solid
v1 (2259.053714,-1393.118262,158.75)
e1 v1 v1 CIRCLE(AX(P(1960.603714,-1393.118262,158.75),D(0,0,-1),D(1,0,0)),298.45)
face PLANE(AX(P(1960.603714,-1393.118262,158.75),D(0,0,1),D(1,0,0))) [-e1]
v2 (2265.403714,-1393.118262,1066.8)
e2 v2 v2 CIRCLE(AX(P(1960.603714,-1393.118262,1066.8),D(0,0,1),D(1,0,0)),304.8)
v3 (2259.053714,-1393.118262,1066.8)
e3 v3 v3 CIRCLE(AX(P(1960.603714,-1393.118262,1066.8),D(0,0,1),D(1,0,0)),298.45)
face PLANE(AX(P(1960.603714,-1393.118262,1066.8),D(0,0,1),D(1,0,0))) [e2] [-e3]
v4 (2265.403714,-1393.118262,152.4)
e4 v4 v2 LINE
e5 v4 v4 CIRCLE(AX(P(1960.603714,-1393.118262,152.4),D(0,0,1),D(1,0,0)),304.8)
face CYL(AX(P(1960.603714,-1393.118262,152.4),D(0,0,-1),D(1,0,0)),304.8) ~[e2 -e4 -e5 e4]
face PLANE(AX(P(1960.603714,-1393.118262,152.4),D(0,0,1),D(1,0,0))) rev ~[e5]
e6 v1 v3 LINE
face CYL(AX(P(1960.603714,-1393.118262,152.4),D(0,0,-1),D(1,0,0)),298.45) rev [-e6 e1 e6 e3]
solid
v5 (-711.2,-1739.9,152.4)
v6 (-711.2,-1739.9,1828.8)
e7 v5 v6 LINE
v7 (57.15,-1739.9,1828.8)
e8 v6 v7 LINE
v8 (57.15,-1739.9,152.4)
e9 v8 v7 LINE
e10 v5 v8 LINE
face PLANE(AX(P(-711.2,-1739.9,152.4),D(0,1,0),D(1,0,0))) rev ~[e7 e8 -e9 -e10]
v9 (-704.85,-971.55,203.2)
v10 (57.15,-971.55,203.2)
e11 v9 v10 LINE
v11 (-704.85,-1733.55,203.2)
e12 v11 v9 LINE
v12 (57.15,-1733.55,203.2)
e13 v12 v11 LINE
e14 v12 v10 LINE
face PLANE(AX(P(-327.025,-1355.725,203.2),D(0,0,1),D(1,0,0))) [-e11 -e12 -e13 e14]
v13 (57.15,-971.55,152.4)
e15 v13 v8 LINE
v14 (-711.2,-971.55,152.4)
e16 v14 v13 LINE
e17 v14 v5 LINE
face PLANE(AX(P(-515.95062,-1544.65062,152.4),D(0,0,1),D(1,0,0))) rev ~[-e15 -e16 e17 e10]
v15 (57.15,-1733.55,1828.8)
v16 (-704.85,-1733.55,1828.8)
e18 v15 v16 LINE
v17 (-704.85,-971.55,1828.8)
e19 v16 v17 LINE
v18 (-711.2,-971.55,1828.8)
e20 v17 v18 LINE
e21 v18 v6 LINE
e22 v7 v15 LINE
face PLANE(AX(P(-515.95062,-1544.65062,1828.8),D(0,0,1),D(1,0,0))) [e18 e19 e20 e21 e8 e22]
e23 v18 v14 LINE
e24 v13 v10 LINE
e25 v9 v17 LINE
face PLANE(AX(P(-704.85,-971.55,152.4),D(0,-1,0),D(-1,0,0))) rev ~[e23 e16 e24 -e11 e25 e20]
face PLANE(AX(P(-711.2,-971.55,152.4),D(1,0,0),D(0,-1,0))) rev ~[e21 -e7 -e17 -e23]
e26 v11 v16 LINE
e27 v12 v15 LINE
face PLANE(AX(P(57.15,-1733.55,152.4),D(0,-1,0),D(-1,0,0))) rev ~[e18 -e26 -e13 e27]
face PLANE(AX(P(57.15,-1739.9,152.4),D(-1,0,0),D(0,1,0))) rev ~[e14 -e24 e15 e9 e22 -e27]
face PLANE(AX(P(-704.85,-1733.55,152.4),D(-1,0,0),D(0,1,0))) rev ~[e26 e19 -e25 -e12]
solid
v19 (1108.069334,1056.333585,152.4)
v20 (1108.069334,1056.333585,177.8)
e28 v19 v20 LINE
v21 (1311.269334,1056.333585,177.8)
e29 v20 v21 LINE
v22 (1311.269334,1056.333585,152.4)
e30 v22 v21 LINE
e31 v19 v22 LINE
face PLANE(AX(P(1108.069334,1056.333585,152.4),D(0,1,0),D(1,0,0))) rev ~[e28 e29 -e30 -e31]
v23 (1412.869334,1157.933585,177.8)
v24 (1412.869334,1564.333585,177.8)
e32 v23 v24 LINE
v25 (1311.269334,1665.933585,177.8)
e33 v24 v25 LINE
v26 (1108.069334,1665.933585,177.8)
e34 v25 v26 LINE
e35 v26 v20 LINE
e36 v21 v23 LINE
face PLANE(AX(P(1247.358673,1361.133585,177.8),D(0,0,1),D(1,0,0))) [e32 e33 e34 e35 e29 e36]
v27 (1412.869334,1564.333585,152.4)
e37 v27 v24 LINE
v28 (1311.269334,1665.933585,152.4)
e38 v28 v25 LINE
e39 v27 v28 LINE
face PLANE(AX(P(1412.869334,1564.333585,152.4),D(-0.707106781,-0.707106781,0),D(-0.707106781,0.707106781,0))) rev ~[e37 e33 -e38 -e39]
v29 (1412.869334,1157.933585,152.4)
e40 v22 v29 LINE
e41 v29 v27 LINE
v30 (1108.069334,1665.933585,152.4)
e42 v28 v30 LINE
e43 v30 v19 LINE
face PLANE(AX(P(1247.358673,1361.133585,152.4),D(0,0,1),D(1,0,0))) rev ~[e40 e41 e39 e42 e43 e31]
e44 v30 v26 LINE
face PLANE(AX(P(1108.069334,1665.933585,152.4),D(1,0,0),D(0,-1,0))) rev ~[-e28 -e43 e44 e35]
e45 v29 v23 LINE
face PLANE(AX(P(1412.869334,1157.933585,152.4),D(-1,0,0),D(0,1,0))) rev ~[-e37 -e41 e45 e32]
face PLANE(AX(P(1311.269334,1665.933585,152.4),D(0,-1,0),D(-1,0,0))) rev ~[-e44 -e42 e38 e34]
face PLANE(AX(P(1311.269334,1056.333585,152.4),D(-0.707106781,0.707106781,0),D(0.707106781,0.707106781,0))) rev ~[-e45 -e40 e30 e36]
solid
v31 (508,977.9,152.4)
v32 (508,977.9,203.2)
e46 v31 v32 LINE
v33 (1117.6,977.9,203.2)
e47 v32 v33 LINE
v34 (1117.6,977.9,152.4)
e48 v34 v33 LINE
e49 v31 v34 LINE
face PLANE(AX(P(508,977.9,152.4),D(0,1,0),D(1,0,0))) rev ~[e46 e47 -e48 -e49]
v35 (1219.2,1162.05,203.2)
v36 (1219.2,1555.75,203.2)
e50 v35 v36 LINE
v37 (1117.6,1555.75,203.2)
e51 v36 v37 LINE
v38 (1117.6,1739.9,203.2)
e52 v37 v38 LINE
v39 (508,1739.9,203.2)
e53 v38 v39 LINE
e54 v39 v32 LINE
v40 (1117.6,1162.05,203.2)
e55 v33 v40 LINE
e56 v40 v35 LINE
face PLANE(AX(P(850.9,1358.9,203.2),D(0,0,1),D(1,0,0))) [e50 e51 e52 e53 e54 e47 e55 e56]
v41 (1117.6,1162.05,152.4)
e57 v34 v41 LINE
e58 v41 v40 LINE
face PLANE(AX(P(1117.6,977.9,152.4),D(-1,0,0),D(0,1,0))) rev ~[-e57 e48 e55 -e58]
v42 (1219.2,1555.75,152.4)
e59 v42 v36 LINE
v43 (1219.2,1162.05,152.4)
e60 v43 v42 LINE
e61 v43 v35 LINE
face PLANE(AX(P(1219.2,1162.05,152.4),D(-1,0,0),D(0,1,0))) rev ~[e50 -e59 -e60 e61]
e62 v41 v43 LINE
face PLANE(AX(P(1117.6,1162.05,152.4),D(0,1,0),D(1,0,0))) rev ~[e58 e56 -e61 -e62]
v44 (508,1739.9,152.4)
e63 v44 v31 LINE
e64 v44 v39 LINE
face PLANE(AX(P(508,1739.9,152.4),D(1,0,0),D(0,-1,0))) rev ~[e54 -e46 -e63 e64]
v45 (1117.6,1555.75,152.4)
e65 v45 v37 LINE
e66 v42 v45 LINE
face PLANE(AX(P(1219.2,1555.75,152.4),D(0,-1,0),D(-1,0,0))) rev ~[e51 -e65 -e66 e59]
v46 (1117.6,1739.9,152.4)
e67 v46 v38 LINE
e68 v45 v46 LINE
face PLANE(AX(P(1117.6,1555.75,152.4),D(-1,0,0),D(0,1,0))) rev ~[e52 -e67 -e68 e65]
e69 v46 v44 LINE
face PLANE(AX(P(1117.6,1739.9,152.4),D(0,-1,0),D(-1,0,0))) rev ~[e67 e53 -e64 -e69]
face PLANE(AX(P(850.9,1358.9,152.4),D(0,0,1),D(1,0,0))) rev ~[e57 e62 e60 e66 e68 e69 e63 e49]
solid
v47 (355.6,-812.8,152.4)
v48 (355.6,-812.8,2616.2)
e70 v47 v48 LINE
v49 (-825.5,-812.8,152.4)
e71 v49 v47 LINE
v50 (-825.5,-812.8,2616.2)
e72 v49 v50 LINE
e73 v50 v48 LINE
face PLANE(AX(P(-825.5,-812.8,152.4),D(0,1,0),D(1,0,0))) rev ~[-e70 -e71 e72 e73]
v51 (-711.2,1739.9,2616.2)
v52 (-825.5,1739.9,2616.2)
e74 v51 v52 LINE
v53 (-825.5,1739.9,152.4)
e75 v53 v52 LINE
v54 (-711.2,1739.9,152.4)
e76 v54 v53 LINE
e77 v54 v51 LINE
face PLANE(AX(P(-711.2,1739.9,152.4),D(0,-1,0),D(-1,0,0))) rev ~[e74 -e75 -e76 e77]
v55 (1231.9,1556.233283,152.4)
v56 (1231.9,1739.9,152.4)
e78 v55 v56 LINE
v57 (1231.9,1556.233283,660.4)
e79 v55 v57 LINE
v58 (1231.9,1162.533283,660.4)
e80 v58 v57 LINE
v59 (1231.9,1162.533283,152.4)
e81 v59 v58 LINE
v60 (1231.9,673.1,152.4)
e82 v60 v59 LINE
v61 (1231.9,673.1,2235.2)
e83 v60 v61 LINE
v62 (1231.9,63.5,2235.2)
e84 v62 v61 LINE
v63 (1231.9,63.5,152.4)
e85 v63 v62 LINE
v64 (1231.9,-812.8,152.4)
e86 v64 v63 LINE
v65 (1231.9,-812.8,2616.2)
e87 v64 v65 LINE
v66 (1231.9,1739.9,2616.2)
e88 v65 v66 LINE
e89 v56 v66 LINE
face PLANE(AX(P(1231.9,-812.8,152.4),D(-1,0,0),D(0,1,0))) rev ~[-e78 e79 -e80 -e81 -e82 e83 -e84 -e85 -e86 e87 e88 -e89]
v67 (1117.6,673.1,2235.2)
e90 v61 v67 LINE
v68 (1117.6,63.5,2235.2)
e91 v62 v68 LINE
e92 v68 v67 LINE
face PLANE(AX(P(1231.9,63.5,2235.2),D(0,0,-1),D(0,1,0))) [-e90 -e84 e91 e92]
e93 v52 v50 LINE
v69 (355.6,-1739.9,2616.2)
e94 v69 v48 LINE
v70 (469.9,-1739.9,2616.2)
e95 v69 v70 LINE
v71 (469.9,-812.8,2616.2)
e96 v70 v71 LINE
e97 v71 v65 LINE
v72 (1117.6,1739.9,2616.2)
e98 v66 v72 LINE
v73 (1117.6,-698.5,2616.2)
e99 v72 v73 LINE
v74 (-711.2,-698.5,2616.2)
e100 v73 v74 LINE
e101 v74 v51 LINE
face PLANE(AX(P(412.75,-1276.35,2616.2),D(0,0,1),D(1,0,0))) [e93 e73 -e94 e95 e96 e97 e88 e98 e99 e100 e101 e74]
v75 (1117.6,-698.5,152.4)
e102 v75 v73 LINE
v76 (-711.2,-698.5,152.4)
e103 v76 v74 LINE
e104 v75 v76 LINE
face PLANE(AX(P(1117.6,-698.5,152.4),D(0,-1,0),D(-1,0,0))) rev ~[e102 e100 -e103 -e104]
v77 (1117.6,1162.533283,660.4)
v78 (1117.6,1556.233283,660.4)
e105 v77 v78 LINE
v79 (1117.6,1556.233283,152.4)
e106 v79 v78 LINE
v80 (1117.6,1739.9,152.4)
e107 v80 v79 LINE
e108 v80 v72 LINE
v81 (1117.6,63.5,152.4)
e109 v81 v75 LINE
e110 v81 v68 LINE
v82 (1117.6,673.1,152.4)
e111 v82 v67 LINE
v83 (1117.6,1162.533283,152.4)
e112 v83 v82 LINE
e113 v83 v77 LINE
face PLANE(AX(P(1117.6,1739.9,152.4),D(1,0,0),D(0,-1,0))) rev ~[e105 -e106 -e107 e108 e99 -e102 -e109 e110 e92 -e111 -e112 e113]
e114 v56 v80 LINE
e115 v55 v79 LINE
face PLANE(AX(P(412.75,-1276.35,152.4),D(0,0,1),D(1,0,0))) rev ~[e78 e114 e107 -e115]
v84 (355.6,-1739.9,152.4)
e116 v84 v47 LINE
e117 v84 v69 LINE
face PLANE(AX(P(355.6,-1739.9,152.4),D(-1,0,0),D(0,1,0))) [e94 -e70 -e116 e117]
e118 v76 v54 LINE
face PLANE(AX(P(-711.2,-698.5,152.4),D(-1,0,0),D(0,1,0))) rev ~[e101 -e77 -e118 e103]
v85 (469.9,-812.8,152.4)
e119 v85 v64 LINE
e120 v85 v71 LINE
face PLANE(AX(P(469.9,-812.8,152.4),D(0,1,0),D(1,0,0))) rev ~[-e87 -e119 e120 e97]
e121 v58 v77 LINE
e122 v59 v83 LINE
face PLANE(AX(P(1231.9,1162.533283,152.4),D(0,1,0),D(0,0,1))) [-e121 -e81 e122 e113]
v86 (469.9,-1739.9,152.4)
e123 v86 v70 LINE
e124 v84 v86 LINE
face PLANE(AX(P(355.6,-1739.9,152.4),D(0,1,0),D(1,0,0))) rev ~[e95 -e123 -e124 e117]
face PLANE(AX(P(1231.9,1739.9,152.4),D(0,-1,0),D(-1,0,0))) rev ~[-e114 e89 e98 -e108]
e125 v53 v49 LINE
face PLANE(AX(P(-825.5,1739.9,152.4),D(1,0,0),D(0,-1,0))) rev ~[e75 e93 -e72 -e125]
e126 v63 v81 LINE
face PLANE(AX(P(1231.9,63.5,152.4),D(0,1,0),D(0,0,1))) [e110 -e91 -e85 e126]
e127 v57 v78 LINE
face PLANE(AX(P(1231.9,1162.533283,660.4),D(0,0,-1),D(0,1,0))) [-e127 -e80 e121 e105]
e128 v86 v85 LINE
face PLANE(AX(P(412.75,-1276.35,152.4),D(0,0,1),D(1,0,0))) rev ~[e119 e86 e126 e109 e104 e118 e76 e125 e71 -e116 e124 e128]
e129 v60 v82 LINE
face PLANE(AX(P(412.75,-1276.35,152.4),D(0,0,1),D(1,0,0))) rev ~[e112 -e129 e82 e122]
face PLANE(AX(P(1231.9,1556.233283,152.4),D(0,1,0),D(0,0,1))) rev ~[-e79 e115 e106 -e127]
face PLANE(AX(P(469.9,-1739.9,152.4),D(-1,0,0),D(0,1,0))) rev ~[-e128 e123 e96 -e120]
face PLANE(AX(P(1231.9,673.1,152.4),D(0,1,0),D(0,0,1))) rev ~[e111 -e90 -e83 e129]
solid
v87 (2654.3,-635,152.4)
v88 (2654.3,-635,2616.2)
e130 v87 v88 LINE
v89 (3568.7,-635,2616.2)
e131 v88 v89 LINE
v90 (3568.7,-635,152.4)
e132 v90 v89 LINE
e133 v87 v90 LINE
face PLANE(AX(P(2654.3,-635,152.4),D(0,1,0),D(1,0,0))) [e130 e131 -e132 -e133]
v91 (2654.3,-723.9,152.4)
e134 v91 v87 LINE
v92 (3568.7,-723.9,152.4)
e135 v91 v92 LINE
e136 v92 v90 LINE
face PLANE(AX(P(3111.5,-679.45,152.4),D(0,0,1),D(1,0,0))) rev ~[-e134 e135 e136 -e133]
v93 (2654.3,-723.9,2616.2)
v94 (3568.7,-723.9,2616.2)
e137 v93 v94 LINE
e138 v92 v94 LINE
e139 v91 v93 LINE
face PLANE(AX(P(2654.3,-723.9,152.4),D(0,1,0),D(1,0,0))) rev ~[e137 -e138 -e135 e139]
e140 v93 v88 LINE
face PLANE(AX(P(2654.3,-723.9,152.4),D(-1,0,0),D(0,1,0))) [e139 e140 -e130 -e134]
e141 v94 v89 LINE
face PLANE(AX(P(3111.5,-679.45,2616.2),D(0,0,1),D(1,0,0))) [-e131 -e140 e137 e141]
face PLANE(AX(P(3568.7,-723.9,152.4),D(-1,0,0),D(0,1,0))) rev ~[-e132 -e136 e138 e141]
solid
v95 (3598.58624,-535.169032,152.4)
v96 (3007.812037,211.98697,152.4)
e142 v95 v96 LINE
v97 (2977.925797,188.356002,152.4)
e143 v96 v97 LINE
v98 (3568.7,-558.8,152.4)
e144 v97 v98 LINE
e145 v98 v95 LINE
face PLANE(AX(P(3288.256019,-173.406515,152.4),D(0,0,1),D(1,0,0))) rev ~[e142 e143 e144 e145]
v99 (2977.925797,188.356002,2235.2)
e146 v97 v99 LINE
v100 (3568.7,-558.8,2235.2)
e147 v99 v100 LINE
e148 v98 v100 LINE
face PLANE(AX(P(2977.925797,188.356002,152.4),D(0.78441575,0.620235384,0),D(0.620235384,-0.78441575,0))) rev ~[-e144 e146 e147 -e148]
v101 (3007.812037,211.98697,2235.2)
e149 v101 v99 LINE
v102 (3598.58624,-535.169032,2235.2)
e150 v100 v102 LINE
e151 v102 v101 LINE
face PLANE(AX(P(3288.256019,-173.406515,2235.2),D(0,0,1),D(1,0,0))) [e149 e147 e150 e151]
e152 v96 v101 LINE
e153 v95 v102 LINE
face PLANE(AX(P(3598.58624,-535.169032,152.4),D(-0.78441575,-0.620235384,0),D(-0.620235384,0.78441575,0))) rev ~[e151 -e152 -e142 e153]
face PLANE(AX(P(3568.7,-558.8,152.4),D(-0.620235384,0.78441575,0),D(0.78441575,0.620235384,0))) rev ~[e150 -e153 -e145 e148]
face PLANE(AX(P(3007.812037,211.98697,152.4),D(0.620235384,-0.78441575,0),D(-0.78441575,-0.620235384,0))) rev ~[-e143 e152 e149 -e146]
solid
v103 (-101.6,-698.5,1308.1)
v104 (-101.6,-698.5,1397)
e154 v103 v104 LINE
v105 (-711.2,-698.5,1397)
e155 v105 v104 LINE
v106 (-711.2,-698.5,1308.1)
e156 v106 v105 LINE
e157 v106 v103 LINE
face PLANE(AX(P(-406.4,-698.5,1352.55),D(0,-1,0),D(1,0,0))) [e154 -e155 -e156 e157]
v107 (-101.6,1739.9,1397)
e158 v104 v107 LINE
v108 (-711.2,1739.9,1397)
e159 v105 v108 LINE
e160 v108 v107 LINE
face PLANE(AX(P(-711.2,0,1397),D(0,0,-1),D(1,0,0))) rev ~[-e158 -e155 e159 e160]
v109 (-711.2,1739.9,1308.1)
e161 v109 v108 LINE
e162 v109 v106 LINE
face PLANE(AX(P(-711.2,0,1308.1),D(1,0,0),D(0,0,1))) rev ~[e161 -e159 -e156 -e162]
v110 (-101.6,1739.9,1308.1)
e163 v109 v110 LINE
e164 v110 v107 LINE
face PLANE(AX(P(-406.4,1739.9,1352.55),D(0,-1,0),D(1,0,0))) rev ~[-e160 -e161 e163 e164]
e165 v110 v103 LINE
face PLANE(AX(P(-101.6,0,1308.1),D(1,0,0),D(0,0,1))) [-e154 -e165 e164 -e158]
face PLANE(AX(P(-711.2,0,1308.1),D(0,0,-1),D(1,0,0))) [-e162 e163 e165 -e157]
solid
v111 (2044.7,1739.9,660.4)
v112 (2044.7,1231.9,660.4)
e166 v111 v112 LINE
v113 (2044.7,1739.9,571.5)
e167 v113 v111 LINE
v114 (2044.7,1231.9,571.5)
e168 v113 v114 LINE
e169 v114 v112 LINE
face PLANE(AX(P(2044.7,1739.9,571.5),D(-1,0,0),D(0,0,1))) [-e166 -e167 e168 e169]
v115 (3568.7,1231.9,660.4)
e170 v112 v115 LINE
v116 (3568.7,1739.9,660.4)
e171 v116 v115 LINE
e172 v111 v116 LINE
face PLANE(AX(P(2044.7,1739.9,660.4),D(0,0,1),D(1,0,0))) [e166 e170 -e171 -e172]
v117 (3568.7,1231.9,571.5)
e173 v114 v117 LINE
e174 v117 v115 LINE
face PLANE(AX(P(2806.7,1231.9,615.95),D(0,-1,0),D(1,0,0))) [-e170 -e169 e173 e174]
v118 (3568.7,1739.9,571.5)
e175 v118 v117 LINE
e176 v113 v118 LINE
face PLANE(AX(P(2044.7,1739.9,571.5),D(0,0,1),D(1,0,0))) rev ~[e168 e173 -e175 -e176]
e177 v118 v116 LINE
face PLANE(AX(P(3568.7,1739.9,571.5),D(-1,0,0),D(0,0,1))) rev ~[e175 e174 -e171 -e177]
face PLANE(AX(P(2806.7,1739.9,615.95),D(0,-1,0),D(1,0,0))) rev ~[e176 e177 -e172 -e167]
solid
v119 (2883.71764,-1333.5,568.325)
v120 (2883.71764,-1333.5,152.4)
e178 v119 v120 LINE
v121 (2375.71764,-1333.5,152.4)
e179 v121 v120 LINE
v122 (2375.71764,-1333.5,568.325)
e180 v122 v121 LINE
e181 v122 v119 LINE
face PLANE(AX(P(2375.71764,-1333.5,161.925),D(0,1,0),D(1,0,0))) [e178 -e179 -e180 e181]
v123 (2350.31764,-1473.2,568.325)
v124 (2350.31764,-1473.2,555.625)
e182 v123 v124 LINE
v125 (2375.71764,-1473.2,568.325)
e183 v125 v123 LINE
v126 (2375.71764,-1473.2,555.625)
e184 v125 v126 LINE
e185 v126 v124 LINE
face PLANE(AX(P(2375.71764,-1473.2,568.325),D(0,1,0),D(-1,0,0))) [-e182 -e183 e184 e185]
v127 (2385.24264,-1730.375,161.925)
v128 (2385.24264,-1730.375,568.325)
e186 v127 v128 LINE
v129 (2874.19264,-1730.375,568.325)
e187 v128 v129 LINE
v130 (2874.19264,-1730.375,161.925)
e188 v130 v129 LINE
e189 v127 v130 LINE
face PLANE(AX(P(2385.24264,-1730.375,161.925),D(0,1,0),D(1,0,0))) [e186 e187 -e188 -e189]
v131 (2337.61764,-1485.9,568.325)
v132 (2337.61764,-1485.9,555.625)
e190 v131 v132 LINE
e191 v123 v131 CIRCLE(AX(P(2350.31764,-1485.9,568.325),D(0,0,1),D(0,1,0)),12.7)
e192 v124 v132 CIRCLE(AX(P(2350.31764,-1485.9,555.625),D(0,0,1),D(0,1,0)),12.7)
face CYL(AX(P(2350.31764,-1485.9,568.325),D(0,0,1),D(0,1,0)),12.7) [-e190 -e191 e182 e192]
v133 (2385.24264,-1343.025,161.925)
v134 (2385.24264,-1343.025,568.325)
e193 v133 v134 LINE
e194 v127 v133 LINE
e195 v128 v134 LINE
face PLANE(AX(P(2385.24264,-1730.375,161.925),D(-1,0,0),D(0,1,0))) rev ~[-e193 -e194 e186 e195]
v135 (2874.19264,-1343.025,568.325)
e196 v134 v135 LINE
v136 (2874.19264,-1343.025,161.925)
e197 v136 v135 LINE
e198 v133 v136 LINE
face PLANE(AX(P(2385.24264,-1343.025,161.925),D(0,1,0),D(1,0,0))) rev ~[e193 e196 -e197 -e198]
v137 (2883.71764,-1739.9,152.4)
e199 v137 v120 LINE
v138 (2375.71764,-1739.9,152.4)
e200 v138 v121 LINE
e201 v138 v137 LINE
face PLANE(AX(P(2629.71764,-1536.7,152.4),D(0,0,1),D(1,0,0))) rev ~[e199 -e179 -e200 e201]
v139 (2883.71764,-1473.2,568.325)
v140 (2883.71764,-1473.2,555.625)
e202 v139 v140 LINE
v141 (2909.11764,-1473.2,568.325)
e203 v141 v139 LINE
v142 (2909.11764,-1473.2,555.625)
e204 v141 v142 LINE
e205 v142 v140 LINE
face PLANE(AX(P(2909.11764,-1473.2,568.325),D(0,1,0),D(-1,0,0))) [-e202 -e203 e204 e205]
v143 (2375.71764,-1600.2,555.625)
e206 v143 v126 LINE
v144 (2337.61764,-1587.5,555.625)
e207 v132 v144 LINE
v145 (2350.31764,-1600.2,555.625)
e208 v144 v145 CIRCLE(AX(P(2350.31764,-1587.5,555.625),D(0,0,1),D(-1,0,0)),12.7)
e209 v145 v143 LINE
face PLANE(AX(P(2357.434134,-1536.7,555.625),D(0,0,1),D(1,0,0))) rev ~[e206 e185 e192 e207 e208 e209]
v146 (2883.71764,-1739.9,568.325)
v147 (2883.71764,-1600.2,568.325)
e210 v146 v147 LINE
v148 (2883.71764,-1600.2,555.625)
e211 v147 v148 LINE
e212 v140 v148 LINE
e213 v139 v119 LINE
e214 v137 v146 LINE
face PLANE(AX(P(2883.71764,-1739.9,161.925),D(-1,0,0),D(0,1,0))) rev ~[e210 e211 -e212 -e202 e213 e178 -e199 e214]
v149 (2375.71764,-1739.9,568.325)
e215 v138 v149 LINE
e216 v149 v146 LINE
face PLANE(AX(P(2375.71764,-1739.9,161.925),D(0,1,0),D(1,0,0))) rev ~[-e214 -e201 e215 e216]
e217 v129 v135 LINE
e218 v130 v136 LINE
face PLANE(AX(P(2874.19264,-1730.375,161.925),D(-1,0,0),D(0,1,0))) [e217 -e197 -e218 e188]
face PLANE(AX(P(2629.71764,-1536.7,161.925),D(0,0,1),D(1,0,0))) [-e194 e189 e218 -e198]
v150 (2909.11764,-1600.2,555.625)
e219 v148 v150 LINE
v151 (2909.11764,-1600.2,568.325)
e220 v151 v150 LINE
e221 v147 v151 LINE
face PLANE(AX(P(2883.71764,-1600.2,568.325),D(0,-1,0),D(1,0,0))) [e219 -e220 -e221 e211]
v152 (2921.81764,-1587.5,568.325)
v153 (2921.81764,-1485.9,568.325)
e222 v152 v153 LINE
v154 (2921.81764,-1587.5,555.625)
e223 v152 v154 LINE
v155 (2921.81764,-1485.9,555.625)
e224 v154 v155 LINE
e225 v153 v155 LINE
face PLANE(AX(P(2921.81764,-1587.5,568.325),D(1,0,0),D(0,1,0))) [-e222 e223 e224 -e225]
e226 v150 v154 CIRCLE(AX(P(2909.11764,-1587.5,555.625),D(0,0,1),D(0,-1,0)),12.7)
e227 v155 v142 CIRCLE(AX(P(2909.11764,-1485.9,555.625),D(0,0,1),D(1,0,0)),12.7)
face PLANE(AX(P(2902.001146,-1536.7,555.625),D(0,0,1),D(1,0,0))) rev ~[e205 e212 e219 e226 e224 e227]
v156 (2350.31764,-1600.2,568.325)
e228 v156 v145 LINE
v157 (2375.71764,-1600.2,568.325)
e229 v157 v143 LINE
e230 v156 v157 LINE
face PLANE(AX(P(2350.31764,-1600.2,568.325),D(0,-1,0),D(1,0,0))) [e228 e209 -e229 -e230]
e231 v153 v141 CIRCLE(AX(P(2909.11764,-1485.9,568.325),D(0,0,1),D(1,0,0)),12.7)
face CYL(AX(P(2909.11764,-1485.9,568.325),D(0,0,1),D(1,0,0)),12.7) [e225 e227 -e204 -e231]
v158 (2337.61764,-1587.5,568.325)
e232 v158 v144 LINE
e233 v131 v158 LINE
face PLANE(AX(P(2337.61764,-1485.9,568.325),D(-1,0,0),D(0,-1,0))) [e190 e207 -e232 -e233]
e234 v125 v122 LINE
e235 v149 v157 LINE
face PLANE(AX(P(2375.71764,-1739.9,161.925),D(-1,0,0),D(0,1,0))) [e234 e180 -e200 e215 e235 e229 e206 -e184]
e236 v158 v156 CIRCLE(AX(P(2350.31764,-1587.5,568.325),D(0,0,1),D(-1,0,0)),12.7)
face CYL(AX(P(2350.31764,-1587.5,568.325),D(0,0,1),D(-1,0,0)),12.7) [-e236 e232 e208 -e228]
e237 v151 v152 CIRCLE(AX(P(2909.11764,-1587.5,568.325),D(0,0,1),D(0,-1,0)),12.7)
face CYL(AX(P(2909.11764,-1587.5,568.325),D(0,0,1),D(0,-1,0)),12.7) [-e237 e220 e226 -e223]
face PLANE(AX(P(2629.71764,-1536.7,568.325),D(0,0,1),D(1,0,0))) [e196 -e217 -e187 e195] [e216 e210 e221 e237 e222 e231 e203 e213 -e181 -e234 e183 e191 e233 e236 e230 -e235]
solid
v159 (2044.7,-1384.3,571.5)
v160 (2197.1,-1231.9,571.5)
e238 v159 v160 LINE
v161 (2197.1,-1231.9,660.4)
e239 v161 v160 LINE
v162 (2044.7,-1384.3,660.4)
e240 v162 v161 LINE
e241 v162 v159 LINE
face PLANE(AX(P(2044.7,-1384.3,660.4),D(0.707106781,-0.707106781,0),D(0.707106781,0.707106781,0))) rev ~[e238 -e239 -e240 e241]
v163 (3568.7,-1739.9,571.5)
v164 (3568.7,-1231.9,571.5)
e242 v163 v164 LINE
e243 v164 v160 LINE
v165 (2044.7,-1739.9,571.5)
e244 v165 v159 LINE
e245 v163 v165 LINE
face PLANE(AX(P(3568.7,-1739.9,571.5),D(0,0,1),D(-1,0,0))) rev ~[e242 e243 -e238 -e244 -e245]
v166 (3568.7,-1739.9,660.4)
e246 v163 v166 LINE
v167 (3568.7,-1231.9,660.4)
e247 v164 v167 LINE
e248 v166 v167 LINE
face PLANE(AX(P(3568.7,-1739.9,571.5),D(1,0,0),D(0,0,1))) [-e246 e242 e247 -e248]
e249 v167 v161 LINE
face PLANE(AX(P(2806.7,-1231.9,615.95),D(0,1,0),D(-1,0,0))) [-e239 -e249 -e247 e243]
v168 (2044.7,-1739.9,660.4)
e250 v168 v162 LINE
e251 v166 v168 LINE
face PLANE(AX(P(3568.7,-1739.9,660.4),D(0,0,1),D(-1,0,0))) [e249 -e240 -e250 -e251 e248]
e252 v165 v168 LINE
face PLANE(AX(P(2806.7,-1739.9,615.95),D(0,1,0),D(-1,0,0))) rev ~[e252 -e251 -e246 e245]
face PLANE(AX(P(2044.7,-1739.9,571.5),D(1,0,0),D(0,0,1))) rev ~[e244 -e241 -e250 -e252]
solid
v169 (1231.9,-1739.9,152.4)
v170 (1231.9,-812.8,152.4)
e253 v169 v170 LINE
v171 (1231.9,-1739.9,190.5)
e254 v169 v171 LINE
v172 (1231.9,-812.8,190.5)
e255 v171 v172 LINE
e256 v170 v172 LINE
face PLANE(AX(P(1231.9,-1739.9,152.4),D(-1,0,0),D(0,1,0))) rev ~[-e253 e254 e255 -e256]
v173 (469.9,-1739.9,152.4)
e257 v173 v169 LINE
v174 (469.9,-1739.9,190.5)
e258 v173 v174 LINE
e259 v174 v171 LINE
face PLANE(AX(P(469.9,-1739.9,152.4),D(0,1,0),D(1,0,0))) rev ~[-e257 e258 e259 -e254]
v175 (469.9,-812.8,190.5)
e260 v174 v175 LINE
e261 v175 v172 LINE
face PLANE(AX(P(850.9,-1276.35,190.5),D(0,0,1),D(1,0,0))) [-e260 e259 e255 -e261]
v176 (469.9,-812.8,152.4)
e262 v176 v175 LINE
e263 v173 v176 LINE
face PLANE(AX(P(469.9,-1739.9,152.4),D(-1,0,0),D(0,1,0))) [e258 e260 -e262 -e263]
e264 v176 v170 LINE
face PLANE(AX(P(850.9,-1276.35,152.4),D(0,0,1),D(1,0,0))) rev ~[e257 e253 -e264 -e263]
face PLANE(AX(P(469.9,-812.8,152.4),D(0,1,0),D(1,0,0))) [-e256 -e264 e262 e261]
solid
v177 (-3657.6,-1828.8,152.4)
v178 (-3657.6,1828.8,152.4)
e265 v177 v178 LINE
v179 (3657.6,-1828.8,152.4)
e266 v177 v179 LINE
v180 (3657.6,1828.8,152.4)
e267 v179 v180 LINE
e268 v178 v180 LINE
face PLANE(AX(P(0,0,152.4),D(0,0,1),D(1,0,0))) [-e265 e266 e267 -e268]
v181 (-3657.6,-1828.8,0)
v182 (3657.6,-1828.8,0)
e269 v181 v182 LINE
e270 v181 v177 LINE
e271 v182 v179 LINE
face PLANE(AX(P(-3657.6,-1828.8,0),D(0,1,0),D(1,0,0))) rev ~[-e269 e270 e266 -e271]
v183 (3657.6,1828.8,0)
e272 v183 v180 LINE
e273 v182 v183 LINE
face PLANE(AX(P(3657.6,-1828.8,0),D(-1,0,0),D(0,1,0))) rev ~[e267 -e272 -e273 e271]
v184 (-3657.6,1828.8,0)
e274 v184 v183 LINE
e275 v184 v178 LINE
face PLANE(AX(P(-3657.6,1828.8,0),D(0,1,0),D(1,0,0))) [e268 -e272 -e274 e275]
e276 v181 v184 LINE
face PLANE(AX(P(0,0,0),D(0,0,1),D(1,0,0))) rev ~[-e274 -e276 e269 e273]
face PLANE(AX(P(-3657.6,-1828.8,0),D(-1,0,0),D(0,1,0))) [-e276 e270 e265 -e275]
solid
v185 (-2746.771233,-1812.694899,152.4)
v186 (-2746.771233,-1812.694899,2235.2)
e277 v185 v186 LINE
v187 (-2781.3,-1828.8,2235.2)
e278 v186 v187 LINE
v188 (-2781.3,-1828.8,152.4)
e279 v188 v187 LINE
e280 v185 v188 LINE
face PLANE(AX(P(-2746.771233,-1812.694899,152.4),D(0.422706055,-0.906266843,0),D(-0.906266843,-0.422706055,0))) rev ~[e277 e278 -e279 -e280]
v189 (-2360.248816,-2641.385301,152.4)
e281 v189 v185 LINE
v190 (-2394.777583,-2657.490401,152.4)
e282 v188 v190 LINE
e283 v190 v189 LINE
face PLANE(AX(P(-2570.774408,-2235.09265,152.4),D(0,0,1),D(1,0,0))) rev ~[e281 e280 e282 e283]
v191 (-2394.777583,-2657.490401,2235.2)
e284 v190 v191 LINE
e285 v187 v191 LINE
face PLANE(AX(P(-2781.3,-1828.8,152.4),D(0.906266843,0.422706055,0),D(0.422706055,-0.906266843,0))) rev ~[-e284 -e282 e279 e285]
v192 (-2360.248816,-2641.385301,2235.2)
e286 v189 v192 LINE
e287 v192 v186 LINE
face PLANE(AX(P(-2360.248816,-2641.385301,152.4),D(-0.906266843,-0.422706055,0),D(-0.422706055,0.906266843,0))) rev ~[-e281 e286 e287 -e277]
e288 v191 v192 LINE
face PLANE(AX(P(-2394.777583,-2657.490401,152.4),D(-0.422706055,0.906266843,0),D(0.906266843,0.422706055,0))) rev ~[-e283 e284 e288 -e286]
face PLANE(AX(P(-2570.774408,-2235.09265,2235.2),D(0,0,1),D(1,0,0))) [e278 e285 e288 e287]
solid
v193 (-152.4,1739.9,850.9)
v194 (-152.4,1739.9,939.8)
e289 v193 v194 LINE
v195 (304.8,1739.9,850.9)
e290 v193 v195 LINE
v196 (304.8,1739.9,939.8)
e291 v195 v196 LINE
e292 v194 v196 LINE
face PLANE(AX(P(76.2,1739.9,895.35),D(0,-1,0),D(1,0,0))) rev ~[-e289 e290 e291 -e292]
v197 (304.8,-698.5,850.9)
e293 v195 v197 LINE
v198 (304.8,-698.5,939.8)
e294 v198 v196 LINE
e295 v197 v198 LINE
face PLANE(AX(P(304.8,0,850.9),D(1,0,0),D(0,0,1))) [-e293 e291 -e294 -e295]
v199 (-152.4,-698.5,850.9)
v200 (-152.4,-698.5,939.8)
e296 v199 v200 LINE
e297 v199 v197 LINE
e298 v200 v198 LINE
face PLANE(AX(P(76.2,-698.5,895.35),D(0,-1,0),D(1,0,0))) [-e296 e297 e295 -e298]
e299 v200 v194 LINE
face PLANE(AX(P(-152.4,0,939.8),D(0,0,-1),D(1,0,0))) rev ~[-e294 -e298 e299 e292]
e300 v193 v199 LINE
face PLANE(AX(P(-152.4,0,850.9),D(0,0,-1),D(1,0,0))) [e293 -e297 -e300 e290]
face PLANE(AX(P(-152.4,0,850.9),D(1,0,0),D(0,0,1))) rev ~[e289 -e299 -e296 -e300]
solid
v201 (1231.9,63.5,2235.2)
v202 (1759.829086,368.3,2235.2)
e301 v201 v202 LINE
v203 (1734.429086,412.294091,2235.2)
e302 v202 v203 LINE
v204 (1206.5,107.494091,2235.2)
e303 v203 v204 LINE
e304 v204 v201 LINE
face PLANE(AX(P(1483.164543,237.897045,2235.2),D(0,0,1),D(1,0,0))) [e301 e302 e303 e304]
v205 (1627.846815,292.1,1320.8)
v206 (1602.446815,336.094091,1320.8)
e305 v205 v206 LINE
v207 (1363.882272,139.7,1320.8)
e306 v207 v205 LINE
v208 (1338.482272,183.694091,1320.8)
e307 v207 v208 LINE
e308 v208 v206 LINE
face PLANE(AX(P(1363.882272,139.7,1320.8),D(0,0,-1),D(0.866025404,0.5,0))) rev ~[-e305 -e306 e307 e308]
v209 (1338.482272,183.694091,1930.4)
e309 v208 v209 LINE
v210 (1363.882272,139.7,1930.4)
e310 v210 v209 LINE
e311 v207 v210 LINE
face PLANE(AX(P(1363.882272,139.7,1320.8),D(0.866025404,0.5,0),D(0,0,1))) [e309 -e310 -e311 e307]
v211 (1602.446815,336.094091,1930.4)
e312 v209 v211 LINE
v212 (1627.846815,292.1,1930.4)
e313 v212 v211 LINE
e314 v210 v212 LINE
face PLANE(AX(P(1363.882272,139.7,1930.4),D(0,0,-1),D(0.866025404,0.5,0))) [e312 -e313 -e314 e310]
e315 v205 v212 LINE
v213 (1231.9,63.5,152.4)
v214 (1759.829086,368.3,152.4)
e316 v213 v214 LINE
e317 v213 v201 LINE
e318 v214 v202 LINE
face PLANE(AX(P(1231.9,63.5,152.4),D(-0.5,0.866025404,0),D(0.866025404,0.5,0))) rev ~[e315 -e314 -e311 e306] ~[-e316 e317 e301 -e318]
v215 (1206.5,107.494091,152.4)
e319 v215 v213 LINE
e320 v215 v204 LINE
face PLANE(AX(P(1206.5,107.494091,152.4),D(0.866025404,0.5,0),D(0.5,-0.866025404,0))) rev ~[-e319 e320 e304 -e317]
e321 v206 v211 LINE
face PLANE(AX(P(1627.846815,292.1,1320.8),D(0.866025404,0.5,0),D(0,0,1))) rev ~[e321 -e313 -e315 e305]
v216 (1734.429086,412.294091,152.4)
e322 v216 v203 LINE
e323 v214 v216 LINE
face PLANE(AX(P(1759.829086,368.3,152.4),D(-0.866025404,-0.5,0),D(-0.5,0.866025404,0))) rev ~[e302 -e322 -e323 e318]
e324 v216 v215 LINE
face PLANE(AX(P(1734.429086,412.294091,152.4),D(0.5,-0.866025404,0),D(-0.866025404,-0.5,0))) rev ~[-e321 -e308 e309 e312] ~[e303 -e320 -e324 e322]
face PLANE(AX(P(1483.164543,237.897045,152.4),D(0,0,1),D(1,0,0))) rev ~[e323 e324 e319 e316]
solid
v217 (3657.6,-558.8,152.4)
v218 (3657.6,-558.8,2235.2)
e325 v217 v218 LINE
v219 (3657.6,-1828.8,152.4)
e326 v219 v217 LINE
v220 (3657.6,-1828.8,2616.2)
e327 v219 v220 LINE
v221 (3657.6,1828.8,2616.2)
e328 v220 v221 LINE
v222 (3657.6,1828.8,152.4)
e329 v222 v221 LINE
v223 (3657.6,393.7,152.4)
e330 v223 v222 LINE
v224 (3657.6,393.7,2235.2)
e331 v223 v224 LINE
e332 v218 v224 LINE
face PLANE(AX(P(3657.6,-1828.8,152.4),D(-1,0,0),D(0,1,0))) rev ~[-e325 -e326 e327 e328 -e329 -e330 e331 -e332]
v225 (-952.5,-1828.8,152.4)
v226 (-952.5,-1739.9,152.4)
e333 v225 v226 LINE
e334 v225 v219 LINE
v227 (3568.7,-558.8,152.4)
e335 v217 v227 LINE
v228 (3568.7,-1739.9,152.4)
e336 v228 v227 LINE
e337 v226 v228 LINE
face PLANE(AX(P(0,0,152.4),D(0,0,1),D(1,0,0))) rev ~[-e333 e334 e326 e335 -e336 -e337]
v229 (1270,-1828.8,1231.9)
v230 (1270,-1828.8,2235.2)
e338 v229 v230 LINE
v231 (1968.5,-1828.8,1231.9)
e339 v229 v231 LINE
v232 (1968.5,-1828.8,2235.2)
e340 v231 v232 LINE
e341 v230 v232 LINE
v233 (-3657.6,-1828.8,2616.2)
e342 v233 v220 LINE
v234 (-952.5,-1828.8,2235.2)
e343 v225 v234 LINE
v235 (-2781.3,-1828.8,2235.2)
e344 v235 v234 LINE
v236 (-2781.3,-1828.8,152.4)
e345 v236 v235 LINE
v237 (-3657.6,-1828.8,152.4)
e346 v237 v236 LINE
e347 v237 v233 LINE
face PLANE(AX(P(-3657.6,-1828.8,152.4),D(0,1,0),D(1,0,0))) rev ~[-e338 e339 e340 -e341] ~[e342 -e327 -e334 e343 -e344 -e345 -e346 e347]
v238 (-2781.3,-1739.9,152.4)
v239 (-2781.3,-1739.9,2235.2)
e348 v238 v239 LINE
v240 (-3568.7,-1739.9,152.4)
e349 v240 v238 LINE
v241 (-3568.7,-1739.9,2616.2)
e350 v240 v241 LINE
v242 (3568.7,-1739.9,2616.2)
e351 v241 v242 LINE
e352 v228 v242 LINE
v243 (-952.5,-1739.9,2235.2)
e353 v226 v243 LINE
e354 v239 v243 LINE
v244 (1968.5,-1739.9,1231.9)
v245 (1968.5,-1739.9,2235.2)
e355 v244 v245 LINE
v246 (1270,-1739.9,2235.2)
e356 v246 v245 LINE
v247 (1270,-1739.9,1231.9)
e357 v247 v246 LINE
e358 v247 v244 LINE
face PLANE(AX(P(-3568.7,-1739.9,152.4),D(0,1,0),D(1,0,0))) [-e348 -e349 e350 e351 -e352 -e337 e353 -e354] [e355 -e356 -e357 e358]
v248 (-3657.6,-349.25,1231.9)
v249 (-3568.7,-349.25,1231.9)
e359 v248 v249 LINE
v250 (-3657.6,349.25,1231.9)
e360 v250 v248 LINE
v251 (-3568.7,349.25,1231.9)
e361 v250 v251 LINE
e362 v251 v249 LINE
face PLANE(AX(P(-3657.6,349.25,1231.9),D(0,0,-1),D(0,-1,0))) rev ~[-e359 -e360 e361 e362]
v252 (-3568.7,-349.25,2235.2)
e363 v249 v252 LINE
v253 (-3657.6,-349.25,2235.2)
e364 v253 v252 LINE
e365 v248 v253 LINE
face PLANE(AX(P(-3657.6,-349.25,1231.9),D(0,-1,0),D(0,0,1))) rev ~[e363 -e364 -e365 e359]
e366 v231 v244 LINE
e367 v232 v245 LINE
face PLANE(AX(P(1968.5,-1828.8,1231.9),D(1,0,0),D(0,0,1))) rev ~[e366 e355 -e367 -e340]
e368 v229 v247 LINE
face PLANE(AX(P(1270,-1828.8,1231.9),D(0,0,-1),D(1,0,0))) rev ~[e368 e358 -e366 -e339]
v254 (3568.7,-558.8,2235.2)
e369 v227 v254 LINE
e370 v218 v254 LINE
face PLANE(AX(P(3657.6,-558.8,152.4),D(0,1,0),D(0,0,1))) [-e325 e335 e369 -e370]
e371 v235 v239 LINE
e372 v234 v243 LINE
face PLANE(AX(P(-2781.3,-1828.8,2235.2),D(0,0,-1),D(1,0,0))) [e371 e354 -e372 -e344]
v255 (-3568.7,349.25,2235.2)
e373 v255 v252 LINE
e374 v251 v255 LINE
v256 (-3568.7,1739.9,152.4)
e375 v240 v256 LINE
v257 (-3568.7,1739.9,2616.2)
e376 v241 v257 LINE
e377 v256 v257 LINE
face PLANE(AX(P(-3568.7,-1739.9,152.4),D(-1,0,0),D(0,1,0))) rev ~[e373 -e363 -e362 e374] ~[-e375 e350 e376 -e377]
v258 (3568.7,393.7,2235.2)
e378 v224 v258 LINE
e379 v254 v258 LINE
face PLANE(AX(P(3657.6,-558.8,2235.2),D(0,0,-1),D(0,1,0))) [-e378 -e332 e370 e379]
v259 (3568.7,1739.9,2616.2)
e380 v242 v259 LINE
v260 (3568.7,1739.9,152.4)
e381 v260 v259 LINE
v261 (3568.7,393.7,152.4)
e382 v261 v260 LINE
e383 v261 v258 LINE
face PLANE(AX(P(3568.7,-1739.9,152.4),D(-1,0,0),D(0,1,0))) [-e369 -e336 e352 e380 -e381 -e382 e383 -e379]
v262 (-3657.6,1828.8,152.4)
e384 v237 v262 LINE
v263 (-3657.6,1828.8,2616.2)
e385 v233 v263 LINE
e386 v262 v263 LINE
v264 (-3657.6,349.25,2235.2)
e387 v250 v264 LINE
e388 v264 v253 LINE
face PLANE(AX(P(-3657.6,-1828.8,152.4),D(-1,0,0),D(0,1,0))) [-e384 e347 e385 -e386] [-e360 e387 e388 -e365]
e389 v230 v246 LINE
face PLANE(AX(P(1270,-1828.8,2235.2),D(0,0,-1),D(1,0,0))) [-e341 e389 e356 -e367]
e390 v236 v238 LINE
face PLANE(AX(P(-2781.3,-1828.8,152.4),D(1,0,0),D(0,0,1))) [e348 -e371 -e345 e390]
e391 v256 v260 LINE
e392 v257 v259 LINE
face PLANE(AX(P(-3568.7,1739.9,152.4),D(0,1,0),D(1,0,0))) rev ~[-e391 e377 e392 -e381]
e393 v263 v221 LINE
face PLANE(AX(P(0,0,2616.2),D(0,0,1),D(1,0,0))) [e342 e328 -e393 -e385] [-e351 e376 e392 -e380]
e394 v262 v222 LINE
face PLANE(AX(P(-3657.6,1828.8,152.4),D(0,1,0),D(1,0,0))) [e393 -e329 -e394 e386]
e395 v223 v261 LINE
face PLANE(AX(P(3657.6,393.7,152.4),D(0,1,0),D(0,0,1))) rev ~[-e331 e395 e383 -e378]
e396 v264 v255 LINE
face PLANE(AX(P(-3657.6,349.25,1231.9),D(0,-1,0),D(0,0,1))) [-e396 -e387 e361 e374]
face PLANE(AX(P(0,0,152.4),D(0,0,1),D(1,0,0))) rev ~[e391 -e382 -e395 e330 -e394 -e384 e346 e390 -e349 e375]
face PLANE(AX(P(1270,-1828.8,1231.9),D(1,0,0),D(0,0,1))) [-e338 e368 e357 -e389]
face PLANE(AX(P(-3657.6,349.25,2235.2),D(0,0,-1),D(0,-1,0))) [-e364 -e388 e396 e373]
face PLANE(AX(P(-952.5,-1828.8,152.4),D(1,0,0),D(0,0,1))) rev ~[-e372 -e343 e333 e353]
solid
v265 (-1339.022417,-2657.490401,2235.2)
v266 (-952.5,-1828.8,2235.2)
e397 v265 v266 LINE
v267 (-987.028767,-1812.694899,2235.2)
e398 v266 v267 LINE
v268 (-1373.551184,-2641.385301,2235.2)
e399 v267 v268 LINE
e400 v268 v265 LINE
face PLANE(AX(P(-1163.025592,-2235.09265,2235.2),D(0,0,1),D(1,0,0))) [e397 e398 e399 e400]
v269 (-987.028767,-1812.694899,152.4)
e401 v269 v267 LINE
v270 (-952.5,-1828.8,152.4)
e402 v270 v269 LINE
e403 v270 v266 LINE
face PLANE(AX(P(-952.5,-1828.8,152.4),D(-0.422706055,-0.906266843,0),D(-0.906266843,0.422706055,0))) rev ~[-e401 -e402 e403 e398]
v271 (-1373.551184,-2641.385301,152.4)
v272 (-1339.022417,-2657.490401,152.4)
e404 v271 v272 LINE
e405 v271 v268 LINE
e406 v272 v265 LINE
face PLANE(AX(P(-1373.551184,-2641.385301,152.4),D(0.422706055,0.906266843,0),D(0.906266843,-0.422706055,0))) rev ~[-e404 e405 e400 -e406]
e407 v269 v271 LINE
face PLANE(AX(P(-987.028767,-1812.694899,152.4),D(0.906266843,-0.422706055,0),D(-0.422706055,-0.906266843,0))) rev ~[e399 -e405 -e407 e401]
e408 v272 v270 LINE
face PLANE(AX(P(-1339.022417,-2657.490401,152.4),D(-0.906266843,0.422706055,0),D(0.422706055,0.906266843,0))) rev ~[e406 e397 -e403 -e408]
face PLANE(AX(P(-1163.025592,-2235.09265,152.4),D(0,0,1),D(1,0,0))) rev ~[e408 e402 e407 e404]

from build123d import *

# Parameters (mm, degrees)
F0_W           = 7315.2
F0_H           = 3657.6
F1_DEPTH       = 152.4
F2_W           = 7315.2
F2_H           = 3657.6
F2_W_2         = 7137.4
F2_H_2         = 3479.8
F3_DEPTH       = 2463.8
F4_W           = 952.5
F4_H           = 2082.8
F5_DEPTH       = 88.9
F6_W           = 1828.8
F6_H           = 2082.8
F6_W_2         = 698.5
F6_H_2         = 1003.3
F7_DEPTH       = 88.9
F8_W           = 698.5
F8_H           = 1003.3
F9_DEPTH       = 88.9
F10_W          = 114.3
F10_H          = 927.1
F11_DEPTH      = 2463.8
F12_W          = 914.4
F12_H          = 88.9
F13_DEPTH      = 2463.8
F14_W          = 609.6
F14_H          = 2082.8
F15_DEPTH      = 114.3
F16_W          = 609.6
F16_H          = 88.9
F17_DEPTH      = 698.5
F17_DEPTH_BACK = 1739.9
F18_W          = 457.2
F18_H          = 88.9
F19_DEPTH      = 698.5
F19_DEPTH_BACK = 1739.9
F20_W          = 1524
F20_H          = 88.9
F21_DEPTH      = 508
F24_DEPTH      = 2082.8
F26_DEPTH      = 2082.8
F28_DEPTH      = 1676.4
F29_W          = 768.35
F29_H          = 768.35
F30_DEPTH      = 50.8
F31_W          = 1524
F31_H          = 88.9
F32_DEPTH      = 508
F34_DEPTH      = 88.9
F35_W          = 304.8
F35_H          = 609.6
F36_DEPTH      = 50.8
F38_DEPTH      = 50.8
F40_DEPTH      = 25.4
F41_W          = 508
F41_H          = 406.4
F42_DEPTH      = 9.525
F43_W          = 508
F43_H          = 406.4
F43_W_2        = 488.95
F43_H_2        = 387.35
F44_DEPTH      = 406.4
F46_DEPTH      = 12.7
F49_DEPTH      = 2082.8
F50_R          = 304.8
F51_DEPTH      = 914.4
F52_T          = -6.35
F53_W          = 762
F53_H          = 927.1
F54_DEPTH      = 38.1
F55_W          = 393.7
F55_H          = 508
F56_DEPTH      = 114.3


with BuildPart() as f1:
    # F0 (on Top) → F1 (new body)
    with BuildSketch(Plane.XY):
        Rectangle(F0_W, F0_H)
    extrude(amount=F1_DEPTH)


with BuildPart() as f3:
    # F2 (on face) → F3 (new body)
    with BuildSketch(Plane.XY.offset(152.4)):
        Rectangle(F2_W, F2_H)
        Rectangle(F2_W_2, F2_H_2, mode=Mode.SUBTRACT)
    extrude(amount=F3_DEPTH)

    # F4 (on face) → F5 (cut, through all)
    with BuildSketch(Plane.YZ.offset(3657.6)):
        with Locations((-82.55, 1193.8)):
            Rectangle(F4_W, F4_H)
    extrude(amount=-F5_DEPTH, mode=Mode.SUBTRACT)

    # F6 (on face) → F7 (cut, through all)
    with BuildSketch(Plane.XZ.offset(1828.8)):
        with Locations((-1866.9, 1193.8)):
            Rectangle(F6_W, F6_H)
        with Locations((1619.25, 1733.55)):
            Rectangle(F6_W_2, F6_H_2)
    extrude(amount=-F7_DEPTH, mode=Mode.SUBTRACT)

    # F8 (on face) → F9 (cut, through all)
    with BuildSketch(Plane(origin=(-3657.6, 0, 0), x_dir=(0, -1, 0), z_dir=(-1, 0, 0))):
        with Locations((0, 1733.55)):
            Rectangle(F8_W, F8_H)
    extrude(amount=-F9_DEPTH, mode=Mode.SUBTRACT)


with BuildPart() as f11:
    # F10 (on face) → F11 (new body, through all)
    with BuildSketch(Plane.XY.offset(152.4)):
        with Locations((412.75, -1276.35)):
            Rectangle(F10_W, F10_H)
        Polygon((-825.5, -812.8), (355.6, -812.8), (469.9, -812.8), (1231.9, -812.8), (1231.9, 1739.9), (1117.6, 1739.9), (1117.6, -698.5), (-711.2, -698.5), (-711.2, 1739.9), (-825.5, 1739.9), align=None)
    extrude(amount=F11_DEPTH)

    # F14 (on face) → F15 (cut, through all)
    with BuildSketch(Plane.YZ.offset(1231.9)):
        with Locations((368.3, 1193.8)):
            Rectangle(F14_W, F14_H)
    extrude(amount=-F15_DEPTH, mode=Mode.SUBTRACT)

    # F55 (on face) → F56 (cut, through all)
    with BuildSketch(Plane.YZ.offset(1231.9)):
        with Locations((1359.3832832336, 406.4)):
            Rectangle(F55_W, F55_H)
    extrude(amount=-F56_DEPTH, mode=Mode.SUBTRACT)


with BuildPart() as f13:
    # F12 (on face) → F13 (new body, through all)
    with BuildSketch(Plane.XY.offset(152.4)):
        with Locations((3111.5, -679.45)):
            Rectangle(F12_W, F12_H)
    extrude(amount=F13_DEPTH)


with BuildPart() as f17:
    # F16 (on Front) → F17 (new body, two sides)
    with BuildSketch(Plane.XZ) as f17_sk:
        with Locations((-406.4, 1352.55)):
            Rectangle(F16_W, F16_H)
    extrude(amount=F17_DEPTH)
    extrude(f17_sk.sketch, amount=-F17_DEPTH_BACK)


with BuildPart() as f19:
    # F18 (on Front) → F19 (new body, two sides)
    with BuildSketch(Plane.XZ) as f19_sk:
        with Locations((76.2, 895.35)):
            Rectangle(F18_W, F18_H)
    extrude(amount=F19_DEPTH)
    extrude(f19_sk.sketch, amount=-F19_DEPTH_BACK)


with BuildPart() as f21:
    # F20 (on face) → F21 (new body)
    with BuildSketch(Plane.XZ.offset(-1739.9)):
        with Locations((2806.7, 615.95)):
            Rectangle(F20_W, F20_H)
    extrude(amount=F21_DEPTH)


with BuildPart() as f24:
    # F23 (on face) → F24 (new body)
    with BuildSketch(Plane.XY.offset(152.4)):
        Polygon((1734.429086147, 412.2940905122), (1206.5, 107.4940905122), (1231.9, 63.5), (1759.829086147, 368.3), align=None)
    extrude(amount=F24_DEPTH)

    # F35 (on face) → F36 (cut, through all)
    with BuildSketch(Plane(origin=(280.4786934298, -485.803347461, 0), x_dir=(0.8660254038, 0.5, 0), z_dir=(0.5, -0.8660254038, 0))):
        with Locations((1403.406694922, 1625.6)):
            Rectangle(F35_W, F35_H)
    extrude(amount=-F36_DEPTH, mode=Mode.SUBTRACT)


with BuildPart() as f26:
    # F25 (on face) → F26 (new body)
    with BuildSketch(Plane.XY.offset(152.4)):
        Polygon((2977.9257969634, 188.3560018005), (3568.7, -558.8), (3598.586240072, -535.1690318785), (3007.8120370354, 211.986969922), align=None)
    extrude(amount=F26_DEPTH)


with BuildPart() as f28:
    # F27 (on face) → F28 (new body)
    with BuildSketch(Plane.XY.offset(152.4)):
        Polygon((-711.2, -971.55), (-711.2, -1739.9), (57.15, -1739.9), (57.15, -1733.55), (-704.85, -1733.55), (-704.85, -971.55), align=None)
    extrude(amount=F28_DEPTH)

    # F29 (on face) → F30 (join)
    with BuildSketch(Plane.XY.offset(152.4)):
        with Locations((-327.025, -1355.725)):
            Rectangle(F29_W, F29_H)
    extrude(amount=F30_DEPTH)


with BuildPart() as f32:
    # F31 (on face) → F32 (new body)
    with BuildSketch(Plane(origin=(0, -1739.9, 0), x_dir=(-1, 0, 0), z_dir=(0, 1, 0))):
        with Locations((-2806.7, 615.95)):
            Rectangle(F31_W, F31_H)
    extrude(amount=F32_DEPTH)

    # F33 (on face) → F34 (cut, through all)
    with BuildSketch(Plane.XY.offset(660.4)):
        Polygon((2197.1, -1231.9), (2044.7, -1231.9), (2044.7, -1384.3), align=None)
    extrude(amount=-F34_DEPTH, mode=Mode.SUBTRACT)


with BuildPart() as f38:
    # F37 (on face) → F38 (new body)
    with BuildSketch(Plane.XY.offset(152.4)):
        Polygon((508, 977.9), (1117.6, 977.9), (1117.6, 1162.05), (1219.2, 1162.05), (1219.2, 1555.75), (1117.6, 1555.75), (1117.6, 1739.9), (508, 1739.9), align=None)
    extrude(amount=F38_DEPTH)


with BuildPart() as f40:
    # F39 (on face) → F40 (new body)
    with BuildSketch(Plane.XY.offset(152.4)):
        Polygon((1108.0693342209, 1665.9335847944), (1108.0693342209, 1056.3335847944), (1311.2693342209, 1056.3335847944), (1412.8693342209, 1157.9335847944), (1412.8693342209, 1564.3335847944), (1311.2693342209, 1665.9335847944), align=None)
    extrude(amount=F40_DEPTH)


with BuildPart() as f42:
    # F41 (on face) → F42 (new body)
    with BuildSketch(Plane.XY.offset(152.4)):
        with Locations((2629.7176399231, -1536.7)):
            Rectangle(F41_W, F41_H)
    extrude(amount=F42_DEPTH)

    # F43 (on face) → F44 (join)
    with BuildSketch(Plane.XY.offset(161.925)):
        with Locations((2629.7176399231, -1536.7)):
            Rectangle(F43_W, F43_H)
        with Locations((2629.7176399231, -1536.7)):
            Rectangle(F43_W_2, F43_H_2, mode=Mode.SUBTRACT)
    extrude(amount=F44_DEPTH)

    # F45 (on face) → F46 (join)
    with BuildSketch(Plane.XY.offset(568.325)):
        with BuildLine():
            Line((2350.3176399231, -1600.2), (2375.7176399231, -1600.2))
            Line((2375.7176399231, -1600.2), (2375.7176399231, -1473.2))
            Line((2375.7176399231, -1473.2), (2350.3176399231, -1473.2))
            ThreePointArc((2350.3176399231, -1473.2), (2341.337383802, -1476.9197438789), (2337.6176399231, -1485.9))
            Line((2337.6176399231, -1485.9), (2337.6176399231, -1587.5))
            ThreePointArc((2337.6176399231, -1587.5), (2341.337383802, -1596.4802561211), (2350.3176399231, -1600.2))
        make_face()
        with BuildLine():
            Line((2883.7176399231, -1473.2), (2883.7176399231, -1600.2))
            Line((2883.7176399231, -1600.2), (2909.1176399231, -1600.2))
            ThreePointArc((2909.1176399231, -1600.2), (2918.0978960442, -1596.4802561211), (2921.8176399231, -1587.5))
            Line((2921.8176399231, -1587.5), (2921.8176399231, -1485.9))
            ThreePointArc((2921.8176399231, -1485.9), (2918.0978960442, -1476.9197438789), (2909.1176399231, -1473.2))
            Line((2909.1176399231, -1473.2), (2883.7176399231, -1473.2))
        make_face()
    extrude(amount=-F46_DEPTH)


with BuildPart() as f49:
    # F48 (on face) → F49 (new body)
    with BuildSketch(Plane.XY.offset(152.4)):
        Polygon((-2746.7712332818, -1812.6948992887), (-2781.3, -1828.8), (-2394.7775829299, -2657.490401237), (-2360.2488162117, -2641.3853005257), align=None)
    extrude(amount=F49_DEPTH)


with BuildPart() as f49b:
    # F48 (on face) → F49, piece 2 (new body)
    with BuildSketch(Plane.XY.offset(152.4)):
        Polygon((-1339.0224170701, -2657.490401237), (-952.5, -1828.8), (-987.0287667182, -1812.6948992887), (-1373.5511837883, -2641.3853005257), align=None)
    extrude(amount=F49_DEPTH)


with BuildPart() as f51:
    # F50 (on face) → F51 (new body)
    with BuildSketch(Plane.XY.offset(152.4)):
        with Locations((1960.6037139893, -1393.118262291)):
            Circle(F50_R)
    extrude(amount=F51_DEPTH)

    # F52
    f52_openings = [f51.faces().sort_by_distance(p)[0] for p in [
        (1960.603714, -1393.118262, 1066.8),
    ]]
    offset(amount=F52_T, openings=f52_openings)


with BuildPart() as f54:
    # F53 (on face) → F54 (new body)
    with BuildSketch(Plane.XY.offset(152.4)):
        with Locations((850.9, -1276.35)):
            Rectangle(F53_W, F53_H)
    extrude(amount=F54_DEPTH)


solid = Compound([f1.part, f3.part, f11.part, f13.part, f17.part, f19.part, f21.part, f24.part, f26.part, f28.part, f32.part, f38.part, f40.part, f42.part, f49.part, f49b.part, f51.part, f54.part])
